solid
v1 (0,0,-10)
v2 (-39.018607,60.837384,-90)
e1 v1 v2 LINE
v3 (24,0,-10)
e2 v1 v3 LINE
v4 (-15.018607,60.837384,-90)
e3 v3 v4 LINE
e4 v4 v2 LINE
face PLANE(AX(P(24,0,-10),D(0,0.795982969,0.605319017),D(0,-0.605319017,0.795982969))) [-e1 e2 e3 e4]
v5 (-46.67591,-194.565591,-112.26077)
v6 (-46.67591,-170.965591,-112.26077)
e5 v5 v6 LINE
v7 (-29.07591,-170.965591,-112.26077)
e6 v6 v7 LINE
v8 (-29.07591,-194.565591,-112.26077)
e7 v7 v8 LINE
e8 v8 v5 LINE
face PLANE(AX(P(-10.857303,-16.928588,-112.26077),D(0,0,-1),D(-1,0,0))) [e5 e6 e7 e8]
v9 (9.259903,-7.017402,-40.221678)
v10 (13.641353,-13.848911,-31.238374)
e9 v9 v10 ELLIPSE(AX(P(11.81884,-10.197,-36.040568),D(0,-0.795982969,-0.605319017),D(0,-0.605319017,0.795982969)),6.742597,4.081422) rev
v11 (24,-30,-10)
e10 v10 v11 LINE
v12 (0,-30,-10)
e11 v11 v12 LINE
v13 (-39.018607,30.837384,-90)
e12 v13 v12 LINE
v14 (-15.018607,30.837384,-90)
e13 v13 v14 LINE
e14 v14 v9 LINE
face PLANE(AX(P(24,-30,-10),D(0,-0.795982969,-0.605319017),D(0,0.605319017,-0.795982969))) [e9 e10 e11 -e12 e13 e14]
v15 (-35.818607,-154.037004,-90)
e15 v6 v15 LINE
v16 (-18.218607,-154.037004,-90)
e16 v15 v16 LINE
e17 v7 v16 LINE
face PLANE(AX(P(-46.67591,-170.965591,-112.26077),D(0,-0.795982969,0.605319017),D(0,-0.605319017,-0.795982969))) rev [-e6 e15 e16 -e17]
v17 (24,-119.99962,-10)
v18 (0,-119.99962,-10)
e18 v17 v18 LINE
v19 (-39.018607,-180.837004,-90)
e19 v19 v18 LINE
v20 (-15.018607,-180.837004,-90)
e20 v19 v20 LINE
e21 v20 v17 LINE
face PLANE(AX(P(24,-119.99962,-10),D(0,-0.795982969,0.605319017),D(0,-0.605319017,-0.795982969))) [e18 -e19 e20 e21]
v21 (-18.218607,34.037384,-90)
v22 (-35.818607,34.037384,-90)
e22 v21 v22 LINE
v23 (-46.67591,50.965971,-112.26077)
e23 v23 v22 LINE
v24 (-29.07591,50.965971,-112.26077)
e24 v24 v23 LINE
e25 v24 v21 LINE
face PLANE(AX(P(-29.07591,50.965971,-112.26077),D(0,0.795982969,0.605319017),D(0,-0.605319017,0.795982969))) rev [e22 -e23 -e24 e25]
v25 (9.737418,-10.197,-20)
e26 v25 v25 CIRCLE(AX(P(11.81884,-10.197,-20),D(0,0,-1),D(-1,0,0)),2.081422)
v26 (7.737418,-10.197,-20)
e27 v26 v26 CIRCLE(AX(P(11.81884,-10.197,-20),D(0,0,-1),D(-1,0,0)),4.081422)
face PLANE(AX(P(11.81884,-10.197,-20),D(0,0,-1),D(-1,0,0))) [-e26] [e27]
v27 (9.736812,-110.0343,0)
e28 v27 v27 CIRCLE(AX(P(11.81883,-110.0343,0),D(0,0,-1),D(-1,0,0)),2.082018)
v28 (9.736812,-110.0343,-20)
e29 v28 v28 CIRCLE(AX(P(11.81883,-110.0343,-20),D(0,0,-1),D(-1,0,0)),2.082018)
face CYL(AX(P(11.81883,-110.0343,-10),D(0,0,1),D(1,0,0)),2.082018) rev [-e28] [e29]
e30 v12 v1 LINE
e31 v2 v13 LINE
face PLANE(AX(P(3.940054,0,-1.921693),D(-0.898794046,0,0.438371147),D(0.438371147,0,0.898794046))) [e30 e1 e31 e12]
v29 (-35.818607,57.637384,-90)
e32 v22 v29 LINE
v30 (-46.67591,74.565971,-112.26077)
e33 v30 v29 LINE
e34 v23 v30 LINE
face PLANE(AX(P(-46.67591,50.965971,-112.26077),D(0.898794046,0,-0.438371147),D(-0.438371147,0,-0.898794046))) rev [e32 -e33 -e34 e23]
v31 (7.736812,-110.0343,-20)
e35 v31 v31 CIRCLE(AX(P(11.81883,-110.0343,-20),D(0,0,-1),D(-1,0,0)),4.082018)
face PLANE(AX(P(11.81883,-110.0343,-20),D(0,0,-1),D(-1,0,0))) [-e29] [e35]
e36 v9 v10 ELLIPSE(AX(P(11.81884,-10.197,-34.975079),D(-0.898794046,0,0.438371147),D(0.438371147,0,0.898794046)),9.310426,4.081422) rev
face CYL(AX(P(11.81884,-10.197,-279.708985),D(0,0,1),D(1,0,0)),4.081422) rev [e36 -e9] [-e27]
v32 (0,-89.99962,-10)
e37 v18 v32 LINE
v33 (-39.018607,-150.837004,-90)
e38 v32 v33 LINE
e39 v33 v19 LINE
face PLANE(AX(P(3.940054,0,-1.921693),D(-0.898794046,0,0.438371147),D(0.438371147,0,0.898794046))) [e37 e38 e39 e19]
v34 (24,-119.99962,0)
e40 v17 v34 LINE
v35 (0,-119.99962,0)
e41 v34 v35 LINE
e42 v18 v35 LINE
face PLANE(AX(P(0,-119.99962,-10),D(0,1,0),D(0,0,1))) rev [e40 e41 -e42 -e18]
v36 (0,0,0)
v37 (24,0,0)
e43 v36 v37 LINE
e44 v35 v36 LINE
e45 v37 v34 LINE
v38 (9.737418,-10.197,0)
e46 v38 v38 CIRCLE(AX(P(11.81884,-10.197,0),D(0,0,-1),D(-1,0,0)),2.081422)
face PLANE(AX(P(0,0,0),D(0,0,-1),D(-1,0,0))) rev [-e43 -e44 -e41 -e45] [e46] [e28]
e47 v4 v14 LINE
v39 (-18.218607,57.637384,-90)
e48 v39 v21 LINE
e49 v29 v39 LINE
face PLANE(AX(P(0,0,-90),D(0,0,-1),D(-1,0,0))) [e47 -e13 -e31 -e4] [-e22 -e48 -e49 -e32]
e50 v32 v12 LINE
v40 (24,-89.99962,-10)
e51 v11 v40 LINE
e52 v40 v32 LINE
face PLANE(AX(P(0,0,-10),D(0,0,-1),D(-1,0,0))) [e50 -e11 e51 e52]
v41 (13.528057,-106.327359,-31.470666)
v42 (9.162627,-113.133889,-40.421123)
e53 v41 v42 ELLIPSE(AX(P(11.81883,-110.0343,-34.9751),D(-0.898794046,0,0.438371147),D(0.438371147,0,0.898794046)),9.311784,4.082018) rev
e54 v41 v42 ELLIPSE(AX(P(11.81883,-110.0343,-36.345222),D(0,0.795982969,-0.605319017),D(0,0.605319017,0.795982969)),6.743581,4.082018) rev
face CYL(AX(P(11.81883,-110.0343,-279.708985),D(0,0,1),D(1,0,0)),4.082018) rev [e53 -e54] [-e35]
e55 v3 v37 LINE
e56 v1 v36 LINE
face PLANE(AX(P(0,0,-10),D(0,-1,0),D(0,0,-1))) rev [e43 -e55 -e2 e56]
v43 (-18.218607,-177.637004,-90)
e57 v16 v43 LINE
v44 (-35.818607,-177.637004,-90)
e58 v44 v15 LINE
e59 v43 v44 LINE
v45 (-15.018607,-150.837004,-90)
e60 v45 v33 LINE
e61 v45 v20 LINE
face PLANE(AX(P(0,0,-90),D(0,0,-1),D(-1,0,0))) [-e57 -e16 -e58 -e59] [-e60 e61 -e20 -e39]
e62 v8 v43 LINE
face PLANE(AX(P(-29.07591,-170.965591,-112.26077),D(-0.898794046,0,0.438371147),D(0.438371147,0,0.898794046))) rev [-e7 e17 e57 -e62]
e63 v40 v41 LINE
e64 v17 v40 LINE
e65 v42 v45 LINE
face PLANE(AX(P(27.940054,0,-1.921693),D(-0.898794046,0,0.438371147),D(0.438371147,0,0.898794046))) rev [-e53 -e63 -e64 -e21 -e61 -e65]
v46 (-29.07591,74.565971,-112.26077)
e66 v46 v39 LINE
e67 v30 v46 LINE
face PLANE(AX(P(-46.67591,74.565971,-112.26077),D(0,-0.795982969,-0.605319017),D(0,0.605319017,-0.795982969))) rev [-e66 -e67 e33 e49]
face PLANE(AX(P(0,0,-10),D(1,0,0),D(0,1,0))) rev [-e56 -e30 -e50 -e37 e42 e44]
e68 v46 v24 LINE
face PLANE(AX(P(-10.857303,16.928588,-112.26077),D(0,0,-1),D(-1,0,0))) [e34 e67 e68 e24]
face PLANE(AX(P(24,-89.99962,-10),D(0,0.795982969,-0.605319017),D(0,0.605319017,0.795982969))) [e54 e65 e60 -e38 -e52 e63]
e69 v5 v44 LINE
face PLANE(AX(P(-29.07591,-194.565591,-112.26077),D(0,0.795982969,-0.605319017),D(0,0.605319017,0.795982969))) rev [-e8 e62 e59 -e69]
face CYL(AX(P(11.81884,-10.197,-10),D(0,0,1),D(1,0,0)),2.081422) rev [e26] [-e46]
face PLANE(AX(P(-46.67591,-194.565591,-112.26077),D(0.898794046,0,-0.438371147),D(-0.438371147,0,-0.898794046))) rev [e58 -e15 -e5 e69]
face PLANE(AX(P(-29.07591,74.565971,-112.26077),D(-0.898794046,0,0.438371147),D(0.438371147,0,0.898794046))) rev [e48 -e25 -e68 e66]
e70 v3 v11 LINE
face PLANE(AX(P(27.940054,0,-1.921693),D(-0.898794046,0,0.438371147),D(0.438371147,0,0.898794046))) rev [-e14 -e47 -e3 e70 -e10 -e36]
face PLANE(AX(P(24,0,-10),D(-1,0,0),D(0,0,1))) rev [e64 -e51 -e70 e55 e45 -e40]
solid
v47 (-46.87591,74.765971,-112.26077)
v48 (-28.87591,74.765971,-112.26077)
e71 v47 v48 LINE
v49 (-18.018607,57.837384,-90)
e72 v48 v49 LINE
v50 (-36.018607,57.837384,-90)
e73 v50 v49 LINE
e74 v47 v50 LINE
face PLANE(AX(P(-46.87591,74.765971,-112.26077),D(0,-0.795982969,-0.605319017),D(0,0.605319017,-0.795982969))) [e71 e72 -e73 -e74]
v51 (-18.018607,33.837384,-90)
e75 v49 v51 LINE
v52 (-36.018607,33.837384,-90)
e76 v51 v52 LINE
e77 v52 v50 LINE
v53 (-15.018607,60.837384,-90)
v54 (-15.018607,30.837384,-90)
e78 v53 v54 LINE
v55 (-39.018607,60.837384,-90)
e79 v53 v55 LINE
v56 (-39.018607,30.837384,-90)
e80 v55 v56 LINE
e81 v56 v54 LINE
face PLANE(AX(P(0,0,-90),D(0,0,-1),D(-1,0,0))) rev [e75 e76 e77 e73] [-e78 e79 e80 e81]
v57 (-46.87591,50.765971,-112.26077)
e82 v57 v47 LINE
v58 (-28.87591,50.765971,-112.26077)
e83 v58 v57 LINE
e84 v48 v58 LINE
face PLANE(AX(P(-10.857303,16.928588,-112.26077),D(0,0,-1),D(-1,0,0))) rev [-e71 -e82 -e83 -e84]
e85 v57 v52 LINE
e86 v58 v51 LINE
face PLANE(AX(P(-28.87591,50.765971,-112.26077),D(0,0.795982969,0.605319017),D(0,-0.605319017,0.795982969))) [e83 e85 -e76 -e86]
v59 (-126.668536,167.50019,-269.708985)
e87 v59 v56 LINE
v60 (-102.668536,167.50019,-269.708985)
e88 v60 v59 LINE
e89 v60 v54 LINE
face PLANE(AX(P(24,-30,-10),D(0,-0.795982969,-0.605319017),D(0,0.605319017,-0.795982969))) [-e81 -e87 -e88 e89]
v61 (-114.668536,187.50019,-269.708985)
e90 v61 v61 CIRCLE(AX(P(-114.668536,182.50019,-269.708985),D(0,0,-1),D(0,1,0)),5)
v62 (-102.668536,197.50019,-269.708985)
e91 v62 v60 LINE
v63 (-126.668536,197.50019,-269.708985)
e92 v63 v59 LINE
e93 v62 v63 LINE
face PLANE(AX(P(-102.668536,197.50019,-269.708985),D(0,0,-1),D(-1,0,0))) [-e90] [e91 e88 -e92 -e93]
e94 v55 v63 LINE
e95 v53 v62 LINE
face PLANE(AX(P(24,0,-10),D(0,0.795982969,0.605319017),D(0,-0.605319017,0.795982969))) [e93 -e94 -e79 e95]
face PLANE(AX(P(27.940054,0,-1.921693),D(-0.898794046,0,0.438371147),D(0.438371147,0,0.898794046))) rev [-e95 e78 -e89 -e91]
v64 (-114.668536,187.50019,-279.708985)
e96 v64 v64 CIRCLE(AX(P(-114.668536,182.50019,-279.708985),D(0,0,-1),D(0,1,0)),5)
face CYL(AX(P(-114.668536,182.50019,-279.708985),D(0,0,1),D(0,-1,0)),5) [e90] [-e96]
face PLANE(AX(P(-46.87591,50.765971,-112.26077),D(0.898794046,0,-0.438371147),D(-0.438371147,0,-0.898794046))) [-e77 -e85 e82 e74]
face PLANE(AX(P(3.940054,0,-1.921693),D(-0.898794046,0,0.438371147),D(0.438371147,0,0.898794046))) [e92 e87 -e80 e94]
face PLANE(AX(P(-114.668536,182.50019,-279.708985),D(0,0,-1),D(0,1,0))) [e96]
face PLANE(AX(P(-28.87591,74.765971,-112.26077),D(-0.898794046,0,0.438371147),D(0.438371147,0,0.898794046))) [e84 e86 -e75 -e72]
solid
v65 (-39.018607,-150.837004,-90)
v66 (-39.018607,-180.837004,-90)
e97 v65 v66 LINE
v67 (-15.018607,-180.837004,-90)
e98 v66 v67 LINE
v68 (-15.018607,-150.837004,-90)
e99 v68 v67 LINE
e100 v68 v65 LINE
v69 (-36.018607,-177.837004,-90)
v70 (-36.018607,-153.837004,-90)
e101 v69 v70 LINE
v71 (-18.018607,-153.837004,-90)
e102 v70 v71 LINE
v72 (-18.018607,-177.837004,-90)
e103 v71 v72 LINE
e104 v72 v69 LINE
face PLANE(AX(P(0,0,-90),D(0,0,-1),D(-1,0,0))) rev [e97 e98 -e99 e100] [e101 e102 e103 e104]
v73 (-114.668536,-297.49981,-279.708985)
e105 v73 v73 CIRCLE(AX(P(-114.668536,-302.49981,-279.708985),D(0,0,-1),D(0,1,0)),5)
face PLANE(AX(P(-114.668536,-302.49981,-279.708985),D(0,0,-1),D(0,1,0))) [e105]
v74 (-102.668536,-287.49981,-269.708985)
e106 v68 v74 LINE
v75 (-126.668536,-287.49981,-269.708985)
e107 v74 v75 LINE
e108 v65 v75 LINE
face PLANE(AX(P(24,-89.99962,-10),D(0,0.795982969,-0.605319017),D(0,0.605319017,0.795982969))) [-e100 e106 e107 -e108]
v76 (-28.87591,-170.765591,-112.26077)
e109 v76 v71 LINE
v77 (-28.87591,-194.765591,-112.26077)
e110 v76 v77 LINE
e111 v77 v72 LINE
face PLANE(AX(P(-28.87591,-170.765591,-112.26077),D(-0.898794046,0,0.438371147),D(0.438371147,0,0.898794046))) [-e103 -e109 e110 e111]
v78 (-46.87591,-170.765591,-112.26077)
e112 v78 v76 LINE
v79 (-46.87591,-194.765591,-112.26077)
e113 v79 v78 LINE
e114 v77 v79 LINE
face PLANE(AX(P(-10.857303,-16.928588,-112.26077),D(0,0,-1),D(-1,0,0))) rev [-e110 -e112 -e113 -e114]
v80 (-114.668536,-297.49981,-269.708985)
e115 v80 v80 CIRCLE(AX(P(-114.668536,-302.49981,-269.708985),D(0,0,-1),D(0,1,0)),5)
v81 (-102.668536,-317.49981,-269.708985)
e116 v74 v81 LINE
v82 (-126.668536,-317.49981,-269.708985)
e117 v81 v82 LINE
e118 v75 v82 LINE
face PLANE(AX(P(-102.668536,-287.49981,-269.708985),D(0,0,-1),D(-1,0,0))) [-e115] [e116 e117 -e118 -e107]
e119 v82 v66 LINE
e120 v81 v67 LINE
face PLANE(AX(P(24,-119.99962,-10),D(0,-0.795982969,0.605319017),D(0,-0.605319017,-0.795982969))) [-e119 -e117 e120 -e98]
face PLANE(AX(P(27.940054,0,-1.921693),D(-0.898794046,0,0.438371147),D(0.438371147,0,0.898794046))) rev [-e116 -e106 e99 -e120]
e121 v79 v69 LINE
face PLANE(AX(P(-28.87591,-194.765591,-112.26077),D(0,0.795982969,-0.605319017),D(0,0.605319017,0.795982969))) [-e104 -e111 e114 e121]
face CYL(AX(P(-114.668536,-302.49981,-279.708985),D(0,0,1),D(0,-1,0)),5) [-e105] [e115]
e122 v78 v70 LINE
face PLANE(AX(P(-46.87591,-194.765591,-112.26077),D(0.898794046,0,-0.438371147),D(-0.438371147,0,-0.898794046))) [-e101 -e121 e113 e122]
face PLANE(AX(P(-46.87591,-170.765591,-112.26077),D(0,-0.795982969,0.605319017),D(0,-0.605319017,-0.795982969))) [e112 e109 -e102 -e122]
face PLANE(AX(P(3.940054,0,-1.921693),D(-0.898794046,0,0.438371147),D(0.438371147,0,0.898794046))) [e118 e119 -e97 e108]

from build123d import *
from OCP.BRepAlgoAPI import BRepAlgoAPI_Cut
from OCP.TopTools import TopTools_ListOfShape

# Parameters (mm, degrees)
SKETCH1_W           = 24
SKETCH1_H           = 119.99962
SKETCH1_R           = 2.081422
SKETCH1_R_2         = 2.082018
BOSS_EXTRUDE1_DEPTH = 10
BOSS_EXTRUDE2_DEPTH = 24
SKETCH7_R           = 5
BOSS_EXTRUDE3_DEPTH = 10
SKETCH8_R           = 2.082018
SKETCH8_R_2         = 2.081422
CUT_EXTRUDE1_DEPTH  = 436.423913
CUT_EXTRUDE2_START  = 10
SKETCH9_R           = 4.081422
SKETCH9_R_2         = 4.082018
CUT_EXTRUDE2_DEPTH  = 426.423913
SKETCH10_W          = 18
SKETCH10_H          = 24
CUT_EXTRUDE3_DEPTH  = 30
SKETCH11_W          = 18
SKETCH11_H          = 24
CUT_EXTRUDE4_DEPTH  = 30
SKETCH12_W          = 17.6
SKETCH12_H          = 23.6
BOSS_EXTRUDE4_DEPTH = 30
SKETCH13_W          = 17.6
SKETCH13_H          = 23.6
BOSS_EXTRUDE5_DEPTH = 30


with BuildPart() as part:
    # Sketch1 → Boss-Extrude1 (new body)
    with BuildSketch(Plane(origin=(0, 0, 0), x_dir=(1, 0, 0), z_dir=(0, 0, -1))):
        with Locations((12, 59.99981)):
            Rectangle(SKETCH1_W, SKETCH1_H)
        with Locations(Location((11.81884, 10.197, 0), (0, 0, 180))):
            Circle(SKETCH1_R, mode=Mode.SUBTRACT)
        with Locations(Location((11.81883, 110.0343, 0), (0, 0, 180))):
            Circle(SKETCH1_R_2, mode=Mode.SUBTRACT)
    extrude(amount=BOSS_EXTRUDE1_DEPTH)

    # Sketch6 → Boss-Extrude2 (add, along a direction that is not the sketch's normal)
    with BuildSketch(Plane(origin=(3.940054, 0, -1.921693), x_dir=(0.43837114678907835, 0, 0.8987940462991666), z_dir=(-0.8987940462991665, 0, 0.4383711467890783))):
        Polygon((-8.98794, 0), (-297.940661, 197.50019), (-297.940661, 167.50019), (-8.98794, -30), align=None)
        Polygon((-297.940661, -287.49981), (-297.940661, -317.49981), (-8.98794, -119.99962), (-8.98794, -89.99962), align=None)
    extrude(amount=-BOSS_EXTRUDE2_DEPTH, dir=(-1, 0, 0))

    # Sketch7 → Boss-Extrude3 (add)
    with BuildSketch(Plane(origin=(0, 0, -269.708985), x_dir=(1, 0, 0), z_dir=(0, 0, -1))):
        with Locations(Location((-114.668536, -182.50019, 0), (0, 0, 270))):
            Circle(SKETCH7_R)
        with Locations(Location((-114.668536, 302.49981, 0), (0, 0, 270))):
            Circle(SKETCH7_R)
    extrude(amount=BOSS_EXTRUDE3_DEPTH)


with BuildPart() as cut_extrude1_tool:
    # Sketch8 → Cut-Extrude1 (new, through all)
    with BuildSketch(Plane(origin=(0, 0, -10), x_dir=(1, 0, 0), z_dir=(0, 0, -1))):
        with Locations(Location((11.81883, 110.0343, 0), (0, 0, 286.999931))):
            Circle(SKETCH8_R)
        with Locations(Location((11.81884, 10.197, 0), (0, 0, 69.457399))):
            Circle(SKETCH8_R_2)
    extrude(amount=CUT_EXTRUDE1_DEPTH)


with BuildPart() as part_1:
    add(part.part)

    # Cut-Extrude1: cut by cut_extrude1_tool, with a tolerance
    cut_extrude1_stock = TopTools_ListOfShape()
    cut_extrude1_stock.Append(part_1.part.wrapped)
    cut_extrude1_tools = TopTools_ListOfShape()
    cut_extrude1_tools.Append(cut_extrude1_tool.part.wrapped)
    cut_extrude1_cut = BRepAlgoAPI_Cut()
    cut_extrude1_cut.SetArguments(cut_extrude1_stock)
    cut_extrude1_cut.SetTools(cut_extrude1_tools)
    cut_extrude1_cut.SetFuzzyValue(0.00001)
    cut_extrude1_cut.Build()
    add(Compound.cast(cut_extrude1_cut.Shape()).solids(), mode=Mode.REPLACE)

    # Sketch9 → Cut-Extrude2 (cut, through all)
    with BuildSketch(Plane(origin=(0, 0, -10), x_dir=(1, 0, 0), z_dir=(0, 0, -1)).offset(CUT_EXTRUDE2_START)):
        with Locations(Location((11.81884, 10.197, 0), (0, 0, 63.478176))):
            Circle(SKETCH9_R)
        with Locations(Location((11.81883, 110.0343, 0), (0, 0, 294.753869))):
            Circle(SKETCH9_R_2)
    extrude(amount=CUT_EXTRUDE2_DEPTH, mode=Mode.SUBTRACT)


with BuildPart() as body_2:
    # Split1: the piece on the far side of the plane
    add(part_1.part)
    split(bisect_by=Plane(origin=(0, 0, -90), x_dir=(-1, 0, 0), z_dir=(0, 0, -1)), keep=Keep.BOTTOM)


with BuildPart() as part_2:
    add(part_1.part)

    # Split1
    split(bisect_by=Plane(origin=(0, 0, -90), x_dir=(-1, 0, 0), z_dir=(0, 0, -1)), keep=Keep.TOP)

    # Sketch10 → Cut-Extrude3 (cut, along a direction that is not the sketch's normal)
    with BuildSketch(Plane(origin=(0, 0, -90), x_dir=(-1, 0, 0), z_dir=(0, 0, -1))):
        with Locations((27.018607, -165.837004)):
            Rectangle(SKETCH10_W, SKETCH10_H)
    extrude(amount=CUT_EXTRUDE3_DEPTH, dir=(-0.36191010187111433, -0.5642862571428574, -0.7420256721726983), mode=Mode.SUBTRACT)

    # Sketch11 → Cut-Extrude4 (cut, along a direction that is not the sketch's normal)
    with BuildSketch(Plane(origin=(0, 0, -90), x_dir=(-1, 0, 0), z_dir=(0, 0, -1))):
        with Locations((27.018607, 45.837384)):
            Rectangle(SKETCH11_W, SKETCH11_H)
    extrude(amount=CUT_EXTRUDE4_DEPTH, dir=(-0.36191010187111433, 0.5642862571428574, -0.7420256721726983), mode=Mode.SUBTRACT)


with BuildPart() as body_3:
    # Sketch12 → Boss-Extrude4 (new, along a direction that is not the sketch's normal)
    with BuildSketch(Plane(origin=(0, 0, -90), x_dir=(-1, 0, 0), z_dir=(0, 0, -1))):
        with Locations((27.018607, -165.837004)):
            Rectangle(SKETCH12_W, SKETCH12_H)
    extrude(amount=BOSS_EXTRUDE4_DEPTH, dir=(-0.36191010187111433, -0.5642862571428575, -0.7420256721726983))


with BuildPart() as body_4:
    # Sketch13 → Boss-Extrude5 (new, along a direction that is not the sketch's normal)
    with BuildSketch(Plane(origin=(0, 0, -90), x_dir=(-1, 0, 0), z_dir=(0, 0, -1))):
        with Locations((27.018607, 45.837384)):
            Rectangle(SKETCH13_W, SKETCH13_H)
    extrude(amount=BOSS_EXTRUDE5_DEPTH, dir=(-0.36191010187111433, 0.5642862571428574, -0.7420256721726983))

    # Combine1: union body 3, body 2
    add(body_3.part)
    add(body_2.part)


solid = Compound([part_2.part, body_4.part])
